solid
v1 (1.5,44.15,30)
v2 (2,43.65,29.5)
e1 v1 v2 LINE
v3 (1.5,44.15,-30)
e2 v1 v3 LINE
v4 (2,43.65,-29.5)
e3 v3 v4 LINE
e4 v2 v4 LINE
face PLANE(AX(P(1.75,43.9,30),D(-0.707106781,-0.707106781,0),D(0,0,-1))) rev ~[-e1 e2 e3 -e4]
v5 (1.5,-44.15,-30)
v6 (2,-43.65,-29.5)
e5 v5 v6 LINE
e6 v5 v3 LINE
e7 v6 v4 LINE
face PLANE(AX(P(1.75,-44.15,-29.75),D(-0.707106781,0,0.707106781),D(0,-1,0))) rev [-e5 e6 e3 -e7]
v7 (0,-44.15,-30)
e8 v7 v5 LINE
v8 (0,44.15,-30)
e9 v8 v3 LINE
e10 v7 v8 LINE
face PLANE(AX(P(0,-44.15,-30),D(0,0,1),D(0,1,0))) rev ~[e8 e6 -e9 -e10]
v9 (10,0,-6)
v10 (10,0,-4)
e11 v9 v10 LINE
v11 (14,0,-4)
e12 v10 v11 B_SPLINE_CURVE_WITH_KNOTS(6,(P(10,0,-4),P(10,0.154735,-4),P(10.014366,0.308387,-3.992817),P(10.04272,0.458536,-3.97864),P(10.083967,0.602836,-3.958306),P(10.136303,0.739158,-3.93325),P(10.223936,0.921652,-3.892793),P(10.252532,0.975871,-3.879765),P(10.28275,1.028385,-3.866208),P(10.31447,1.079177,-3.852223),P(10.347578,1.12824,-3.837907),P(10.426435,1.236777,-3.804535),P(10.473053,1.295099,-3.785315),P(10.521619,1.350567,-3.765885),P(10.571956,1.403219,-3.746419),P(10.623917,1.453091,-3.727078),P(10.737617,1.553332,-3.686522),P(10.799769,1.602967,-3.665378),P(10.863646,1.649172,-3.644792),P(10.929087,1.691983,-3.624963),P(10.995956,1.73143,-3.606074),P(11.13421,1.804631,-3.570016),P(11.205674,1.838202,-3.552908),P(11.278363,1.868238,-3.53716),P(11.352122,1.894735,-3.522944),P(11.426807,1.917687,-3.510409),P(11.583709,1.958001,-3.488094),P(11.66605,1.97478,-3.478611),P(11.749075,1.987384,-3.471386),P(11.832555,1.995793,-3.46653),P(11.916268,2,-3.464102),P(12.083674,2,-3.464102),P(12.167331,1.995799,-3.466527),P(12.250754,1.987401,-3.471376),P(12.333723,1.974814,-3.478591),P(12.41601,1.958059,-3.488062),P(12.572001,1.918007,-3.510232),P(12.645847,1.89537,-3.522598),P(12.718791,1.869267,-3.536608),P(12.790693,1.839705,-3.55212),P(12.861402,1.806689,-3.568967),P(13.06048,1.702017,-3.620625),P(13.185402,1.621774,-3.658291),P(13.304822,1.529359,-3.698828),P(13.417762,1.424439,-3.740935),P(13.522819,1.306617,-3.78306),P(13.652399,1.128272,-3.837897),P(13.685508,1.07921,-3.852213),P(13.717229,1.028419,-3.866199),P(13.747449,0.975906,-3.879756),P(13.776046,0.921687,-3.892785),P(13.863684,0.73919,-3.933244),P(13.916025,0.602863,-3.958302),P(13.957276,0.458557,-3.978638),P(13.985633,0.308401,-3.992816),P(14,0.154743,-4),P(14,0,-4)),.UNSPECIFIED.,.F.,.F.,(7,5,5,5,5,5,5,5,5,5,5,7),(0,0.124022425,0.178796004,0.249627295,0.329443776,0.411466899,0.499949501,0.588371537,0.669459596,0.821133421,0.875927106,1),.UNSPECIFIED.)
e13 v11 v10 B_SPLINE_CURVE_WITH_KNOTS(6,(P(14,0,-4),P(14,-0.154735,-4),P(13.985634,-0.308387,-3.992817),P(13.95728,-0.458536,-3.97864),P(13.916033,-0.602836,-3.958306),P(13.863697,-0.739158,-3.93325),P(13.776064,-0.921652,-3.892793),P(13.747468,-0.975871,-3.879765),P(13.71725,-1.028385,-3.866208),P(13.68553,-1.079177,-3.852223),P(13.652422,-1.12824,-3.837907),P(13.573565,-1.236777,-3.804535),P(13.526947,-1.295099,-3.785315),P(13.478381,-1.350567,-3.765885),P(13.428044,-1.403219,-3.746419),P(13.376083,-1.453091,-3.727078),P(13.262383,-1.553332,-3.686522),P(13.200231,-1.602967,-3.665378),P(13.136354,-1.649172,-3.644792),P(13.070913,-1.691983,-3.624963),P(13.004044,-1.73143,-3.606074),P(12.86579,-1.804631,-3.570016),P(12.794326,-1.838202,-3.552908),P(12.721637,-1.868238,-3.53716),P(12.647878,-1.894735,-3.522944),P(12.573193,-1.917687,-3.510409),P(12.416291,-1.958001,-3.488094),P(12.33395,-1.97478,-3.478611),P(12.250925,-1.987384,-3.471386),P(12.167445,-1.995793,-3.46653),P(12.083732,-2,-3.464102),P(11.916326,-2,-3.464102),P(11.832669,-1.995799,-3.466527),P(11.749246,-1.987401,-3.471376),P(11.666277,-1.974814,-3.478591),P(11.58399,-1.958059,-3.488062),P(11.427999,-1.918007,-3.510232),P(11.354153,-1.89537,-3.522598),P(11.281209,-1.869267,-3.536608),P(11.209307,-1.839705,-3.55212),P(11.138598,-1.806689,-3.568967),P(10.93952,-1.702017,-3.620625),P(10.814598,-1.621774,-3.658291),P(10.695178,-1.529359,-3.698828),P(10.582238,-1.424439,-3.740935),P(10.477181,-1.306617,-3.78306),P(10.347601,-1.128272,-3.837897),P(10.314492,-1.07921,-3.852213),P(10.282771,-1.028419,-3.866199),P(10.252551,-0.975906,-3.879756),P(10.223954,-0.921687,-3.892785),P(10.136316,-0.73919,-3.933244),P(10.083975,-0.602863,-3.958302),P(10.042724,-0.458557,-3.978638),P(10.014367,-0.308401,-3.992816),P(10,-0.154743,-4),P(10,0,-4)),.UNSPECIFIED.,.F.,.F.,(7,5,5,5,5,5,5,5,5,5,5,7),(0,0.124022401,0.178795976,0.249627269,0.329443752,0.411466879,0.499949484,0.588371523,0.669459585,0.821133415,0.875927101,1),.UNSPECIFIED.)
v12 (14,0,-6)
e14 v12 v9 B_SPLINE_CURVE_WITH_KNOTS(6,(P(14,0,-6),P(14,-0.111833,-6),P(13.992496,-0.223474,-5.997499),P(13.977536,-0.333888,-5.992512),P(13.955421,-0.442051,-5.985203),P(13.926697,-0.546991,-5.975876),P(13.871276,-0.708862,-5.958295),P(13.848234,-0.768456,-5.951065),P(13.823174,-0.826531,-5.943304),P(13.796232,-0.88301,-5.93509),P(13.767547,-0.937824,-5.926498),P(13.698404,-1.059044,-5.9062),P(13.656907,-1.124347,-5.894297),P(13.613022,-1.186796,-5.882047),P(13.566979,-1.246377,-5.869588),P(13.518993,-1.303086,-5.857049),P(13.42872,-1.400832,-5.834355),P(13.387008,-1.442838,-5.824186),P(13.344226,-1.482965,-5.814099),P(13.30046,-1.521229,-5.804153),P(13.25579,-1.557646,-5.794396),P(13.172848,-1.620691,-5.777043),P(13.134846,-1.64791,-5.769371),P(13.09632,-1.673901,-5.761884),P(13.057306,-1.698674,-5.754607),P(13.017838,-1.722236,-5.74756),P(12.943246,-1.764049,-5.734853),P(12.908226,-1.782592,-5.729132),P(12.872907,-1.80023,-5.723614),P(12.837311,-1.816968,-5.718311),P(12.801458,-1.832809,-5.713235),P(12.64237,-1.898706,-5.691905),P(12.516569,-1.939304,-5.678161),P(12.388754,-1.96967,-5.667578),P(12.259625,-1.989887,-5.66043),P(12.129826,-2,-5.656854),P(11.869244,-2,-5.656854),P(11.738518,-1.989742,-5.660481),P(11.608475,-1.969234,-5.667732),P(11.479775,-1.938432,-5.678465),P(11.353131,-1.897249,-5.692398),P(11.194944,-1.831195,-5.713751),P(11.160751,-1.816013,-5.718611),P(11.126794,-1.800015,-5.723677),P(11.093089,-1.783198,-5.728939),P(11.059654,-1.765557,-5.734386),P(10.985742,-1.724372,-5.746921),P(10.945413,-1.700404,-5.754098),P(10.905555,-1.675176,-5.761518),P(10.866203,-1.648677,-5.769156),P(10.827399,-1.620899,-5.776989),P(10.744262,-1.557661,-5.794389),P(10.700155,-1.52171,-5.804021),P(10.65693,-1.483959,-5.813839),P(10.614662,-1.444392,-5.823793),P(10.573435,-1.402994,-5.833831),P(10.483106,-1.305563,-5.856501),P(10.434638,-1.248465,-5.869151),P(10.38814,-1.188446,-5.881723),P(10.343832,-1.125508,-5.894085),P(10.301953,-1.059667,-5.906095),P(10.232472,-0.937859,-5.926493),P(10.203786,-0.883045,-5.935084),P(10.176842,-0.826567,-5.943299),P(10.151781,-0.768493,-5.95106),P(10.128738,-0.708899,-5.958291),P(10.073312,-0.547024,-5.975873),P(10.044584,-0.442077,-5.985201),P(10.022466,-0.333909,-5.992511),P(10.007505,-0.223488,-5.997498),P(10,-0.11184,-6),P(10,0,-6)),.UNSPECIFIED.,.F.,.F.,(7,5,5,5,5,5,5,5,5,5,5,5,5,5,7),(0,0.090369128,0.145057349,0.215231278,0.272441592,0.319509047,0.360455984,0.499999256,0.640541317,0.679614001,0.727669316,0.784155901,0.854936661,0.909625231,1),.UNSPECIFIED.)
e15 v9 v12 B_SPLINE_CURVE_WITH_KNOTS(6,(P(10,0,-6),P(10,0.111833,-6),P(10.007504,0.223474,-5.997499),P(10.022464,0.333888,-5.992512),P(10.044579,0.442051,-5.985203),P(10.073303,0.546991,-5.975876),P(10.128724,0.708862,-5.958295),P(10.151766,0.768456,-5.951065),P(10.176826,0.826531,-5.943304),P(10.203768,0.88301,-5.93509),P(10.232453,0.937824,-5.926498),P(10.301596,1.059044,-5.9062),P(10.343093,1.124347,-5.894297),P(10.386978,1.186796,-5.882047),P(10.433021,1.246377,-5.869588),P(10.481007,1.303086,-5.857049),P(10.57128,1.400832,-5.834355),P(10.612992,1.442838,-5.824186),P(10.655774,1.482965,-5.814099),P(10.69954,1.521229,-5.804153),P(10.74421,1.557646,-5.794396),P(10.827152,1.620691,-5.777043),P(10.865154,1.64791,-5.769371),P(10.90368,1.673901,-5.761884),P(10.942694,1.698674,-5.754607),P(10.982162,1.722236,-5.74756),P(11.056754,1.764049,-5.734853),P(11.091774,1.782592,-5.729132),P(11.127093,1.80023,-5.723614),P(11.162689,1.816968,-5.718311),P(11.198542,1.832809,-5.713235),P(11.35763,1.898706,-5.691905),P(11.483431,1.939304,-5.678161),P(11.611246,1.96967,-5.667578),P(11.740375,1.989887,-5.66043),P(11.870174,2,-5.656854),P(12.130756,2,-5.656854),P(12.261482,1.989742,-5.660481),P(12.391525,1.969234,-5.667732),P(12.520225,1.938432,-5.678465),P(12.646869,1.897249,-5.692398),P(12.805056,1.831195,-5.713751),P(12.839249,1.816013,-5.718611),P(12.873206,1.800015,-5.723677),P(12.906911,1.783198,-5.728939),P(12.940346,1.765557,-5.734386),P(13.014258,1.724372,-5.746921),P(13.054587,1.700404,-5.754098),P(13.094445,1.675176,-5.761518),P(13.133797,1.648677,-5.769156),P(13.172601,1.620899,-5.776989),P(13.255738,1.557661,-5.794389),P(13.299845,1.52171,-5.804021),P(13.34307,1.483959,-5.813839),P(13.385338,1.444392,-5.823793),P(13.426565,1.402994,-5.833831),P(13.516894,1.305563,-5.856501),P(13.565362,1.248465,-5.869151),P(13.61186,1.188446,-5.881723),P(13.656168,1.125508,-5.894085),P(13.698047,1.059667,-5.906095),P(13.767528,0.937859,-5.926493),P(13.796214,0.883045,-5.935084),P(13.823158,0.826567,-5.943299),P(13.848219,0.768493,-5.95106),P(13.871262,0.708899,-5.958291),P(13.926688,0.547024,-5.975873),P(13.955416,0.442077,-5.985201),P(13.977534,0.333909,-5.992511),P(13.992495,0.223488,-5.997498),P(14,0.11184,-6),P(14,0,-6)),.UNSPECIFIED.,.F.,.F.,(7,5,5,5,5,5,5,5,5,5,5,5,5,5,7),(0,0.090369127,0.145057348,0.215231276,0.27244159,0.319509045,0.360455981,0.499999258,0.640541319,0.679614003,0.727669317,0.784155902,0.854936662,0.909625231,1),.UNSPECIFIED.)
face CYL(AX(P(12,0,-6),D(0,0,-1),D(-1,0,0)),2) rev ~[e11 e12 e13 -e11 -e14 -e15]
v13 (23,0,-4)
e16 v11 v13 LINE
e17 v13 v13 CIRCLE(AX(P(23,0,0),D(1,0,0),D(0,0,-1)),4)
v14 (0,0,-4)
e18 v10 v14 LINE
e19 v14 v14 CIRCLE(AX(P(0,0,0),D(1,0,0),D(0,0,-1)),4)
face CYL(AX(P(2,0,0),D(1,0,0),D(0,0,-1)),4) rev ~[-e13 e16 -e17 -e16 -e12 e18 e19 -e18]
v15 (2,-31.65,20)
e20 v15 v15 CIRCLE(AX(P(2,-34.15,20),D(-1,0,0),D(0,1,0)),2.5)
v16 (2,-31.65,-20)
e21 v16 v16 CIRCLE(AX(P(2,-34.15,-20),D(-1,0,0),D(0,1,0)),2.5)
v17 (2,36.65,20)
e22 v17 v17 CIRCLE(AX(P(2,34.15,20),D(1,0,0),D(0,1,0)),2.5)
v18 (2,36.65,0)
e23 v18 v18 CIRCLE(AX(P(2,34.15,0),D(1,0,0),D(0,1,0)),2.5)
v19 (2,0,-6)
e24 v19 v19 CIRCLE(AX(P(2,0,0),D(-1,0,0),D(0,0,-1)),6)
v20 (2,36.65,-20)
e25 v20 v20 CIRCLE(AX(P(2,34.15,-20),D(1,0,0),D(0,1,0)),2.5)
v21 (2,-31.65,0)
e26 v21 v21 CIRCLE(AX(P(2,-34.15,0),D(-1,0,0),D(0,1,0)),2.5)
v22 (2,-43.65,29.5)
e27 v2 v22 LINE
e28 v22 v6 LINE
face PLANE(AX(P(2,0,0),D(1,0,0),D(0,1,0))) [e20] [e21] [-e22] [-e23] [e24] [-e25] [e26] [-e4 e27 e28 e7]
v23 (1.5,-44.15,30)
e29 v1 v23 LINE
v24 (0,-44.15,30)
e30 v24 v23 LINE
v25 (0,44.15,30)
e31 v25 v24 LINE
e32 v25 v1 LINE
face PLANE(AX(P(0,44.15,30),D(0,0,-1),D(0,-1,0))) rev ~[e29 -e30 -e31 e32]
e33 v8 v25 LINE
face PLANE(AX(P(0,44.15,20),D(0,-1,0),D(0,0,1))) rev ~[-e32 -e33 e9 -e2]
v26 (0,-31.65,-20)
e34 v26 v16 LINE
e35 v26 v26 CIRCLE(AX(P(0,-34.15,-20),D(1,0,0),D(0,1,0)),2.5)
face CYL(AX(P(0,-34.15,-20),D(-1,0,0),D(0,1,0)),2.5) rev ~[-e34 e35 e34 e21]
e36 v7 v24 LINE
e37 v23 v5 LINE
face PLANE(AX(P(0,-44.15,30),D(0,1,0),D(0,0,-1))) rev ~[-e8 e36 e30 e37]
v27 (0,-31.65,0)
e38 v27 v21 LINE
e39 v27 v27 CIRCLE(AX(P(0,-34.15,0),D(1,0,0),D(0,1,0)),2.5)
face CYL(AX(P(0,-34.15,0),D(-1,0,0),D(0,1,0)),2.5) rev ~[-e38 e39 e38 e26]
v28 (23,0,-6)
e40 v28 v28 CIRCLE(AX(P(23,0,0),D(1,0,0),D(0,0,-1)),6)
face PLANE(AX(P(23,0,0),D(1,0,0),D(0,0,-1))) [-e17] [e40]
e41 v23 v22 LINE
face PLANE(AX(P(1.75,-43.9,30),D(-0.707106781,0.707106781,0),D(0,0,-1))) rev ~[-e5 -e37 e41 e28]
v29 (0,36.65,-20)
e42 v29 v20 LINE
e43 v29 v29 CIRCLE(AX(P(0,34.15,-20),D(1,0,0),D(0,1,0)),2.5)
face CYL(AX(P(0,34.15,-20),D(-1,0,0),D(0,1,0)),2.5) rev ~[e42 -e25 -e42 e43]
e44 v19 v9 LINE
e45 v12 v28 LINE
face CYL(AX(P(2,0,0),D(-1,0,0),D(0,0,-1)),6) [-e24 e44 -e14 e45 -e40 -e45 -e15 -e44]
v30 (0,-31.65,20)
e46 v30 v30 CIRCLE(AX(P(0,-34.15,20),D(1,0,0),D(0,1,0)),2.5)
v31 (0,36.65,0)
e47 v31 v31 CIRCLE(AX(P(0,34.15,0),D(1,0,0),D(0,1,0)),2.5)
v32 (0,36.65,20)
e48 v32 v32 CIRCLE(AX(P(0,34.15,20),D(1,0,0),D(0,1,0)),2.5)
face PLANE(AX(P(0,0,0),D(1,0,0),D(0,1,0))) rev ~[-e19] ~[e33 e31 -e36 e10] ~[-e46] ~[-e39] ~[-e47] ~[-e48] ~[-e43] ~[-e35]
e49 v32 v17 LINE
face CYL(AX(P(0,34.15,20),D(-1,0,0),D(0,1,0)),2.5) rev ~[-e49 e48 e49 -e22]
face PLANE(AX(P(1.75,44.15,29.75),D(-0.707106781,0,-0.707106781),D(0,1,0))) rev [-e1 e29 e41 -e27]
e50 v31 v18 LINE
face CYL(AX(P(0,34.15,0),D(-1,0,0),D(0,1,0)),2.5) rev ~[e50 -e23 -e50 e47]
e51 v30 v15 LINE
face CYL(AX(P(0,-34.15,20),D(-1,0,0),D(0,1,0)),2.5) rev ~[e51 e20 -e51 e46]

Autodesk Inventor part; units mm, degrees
ref_plane "YZ Plane" through (0, 0, 0) normal (1, 0, 0) x (0, 1, 0)
ref_plane "XZ Plane" through (0, 0, 0) normal (0, 1, 0) x (-1, 0, 0)
sketch "Sketch1" plane through (0, 0, 0) normal (1, 0, 0) x (0, 1, 0)
  line L0 (44.15, 30) -> (-44.15, 30)
  line L1 (-44.15, 30) -> (-44.15, -30)
  line L2 (-44.15, -30) -> (44.15, -30)
  line L3 (44.15, -30) -> (44.15, 30)
  line L4 (44.15, 30) -> (-44.15, -30) construction
  line L5 (-44.15, 30) -> (44.15, -30) construction
  circle A0 centre (0, 0) radius 4
  circle A1 centre (0, 0) radius 6
  line L6 (44.15, 30) -> (44.15, 20)
  line L7 (44.15, 20) -> (34.15, 20)
  line L8 (44.15, -30) -> (44.15, -20)
  line L9 (44.15, -20) -> (34.15, -20)
  line L10 (-44.15, 30) -> (-44.15, 20)
  line L11 (-44.15, 20) -> (-34.15, 20)
  line L12 (-44.15, -30) -> (-44.15, -20)
  line L13 (-44.15, -20) -> (-34.15, -20)
  line L14 (-44.15, 0) -> (-34.15, 0)
  line L15 (44.15, 0) -> (34.15, 0)
  circle A2 centre (34.15, 20) radius 2.5
  circle A3 centre (34.15, 0) radius 2.5
  circle A4 centre (34.15, -20) radius 2.5
  circle A5 centre (-34.15, 20) radius 2.5
  circle A6 centre (-34.15, 0) radius 2.5
  circle A7 centre (-34.15, -20) radius 2.5
  dimension "d0" = 88.3
  dimension "d1" = 60
  dimension "d2" = 8
  dimension "d3" = 12
  dimension "d4" = 10
  dimension "d5" = 10
  dimension "d6" = 10
  dimension "d7" = 10
  dimension "d8" = 10
  dimension "d9" = 10
  dimension "d10" = 10
  dimension "d11" = 10
  dimension "d12" = 10
  dimension "d13" = 10
  dimension "d14" = 5
  dimension "d15" = 5
  dimension "d16" = 5
  dimension "d17" = 5
  dimension "d18" = 5
  dimension "d19" = 5
extrude "Extrusion1" add sketch "Sketch1" along normal blind 2 contours L3 L2 L1 L0
sketch "Sketch2" plane through (2, 0, 0) normal (1, 0, 0) x (0, 0, -1)
  circle A0 centre (0, 0) radius 6
  circle A1 centre (0, 0) radius 4
  dimension "d22" = 12
  dimension "d23" = 8
extrude "Extrusion2" add sketch "Sketch2" along normal blind 21 and the other way blind 2
ref_plane "Work Plane1" through (2, 0, -6) normal (0, 0, -1) x (-1, 0, 0)
sketch "Sketch3" plane through (2, 0, -6) normal (0, 0, -1) x (-1, 0, 0)
  line L0 (-21, 6) -> (-21, -6) projected
  line L1 (-21, 0) -> (-10, 0)
  circle A0 centre (-10, 0) radius 2
  point P0 (2, 0)
  dimension "d28" = 11
  dimension "d29" = 4
extrude "Extrusion3" cut sketch "Sketch3" against normal blind 5
thread "Thread1" size "M4x0.7" class "6H" standard "ANSI Metric M Profile" length 15
chamfer "Chamfer1" distance 0.5 angle 45 4 edges at (2, 44.15, 0) (2, 0, -30) (2, 0, 30) (2, -44.15, 0)
properties part number "ax4_holder" material "Iron, Malleable"
